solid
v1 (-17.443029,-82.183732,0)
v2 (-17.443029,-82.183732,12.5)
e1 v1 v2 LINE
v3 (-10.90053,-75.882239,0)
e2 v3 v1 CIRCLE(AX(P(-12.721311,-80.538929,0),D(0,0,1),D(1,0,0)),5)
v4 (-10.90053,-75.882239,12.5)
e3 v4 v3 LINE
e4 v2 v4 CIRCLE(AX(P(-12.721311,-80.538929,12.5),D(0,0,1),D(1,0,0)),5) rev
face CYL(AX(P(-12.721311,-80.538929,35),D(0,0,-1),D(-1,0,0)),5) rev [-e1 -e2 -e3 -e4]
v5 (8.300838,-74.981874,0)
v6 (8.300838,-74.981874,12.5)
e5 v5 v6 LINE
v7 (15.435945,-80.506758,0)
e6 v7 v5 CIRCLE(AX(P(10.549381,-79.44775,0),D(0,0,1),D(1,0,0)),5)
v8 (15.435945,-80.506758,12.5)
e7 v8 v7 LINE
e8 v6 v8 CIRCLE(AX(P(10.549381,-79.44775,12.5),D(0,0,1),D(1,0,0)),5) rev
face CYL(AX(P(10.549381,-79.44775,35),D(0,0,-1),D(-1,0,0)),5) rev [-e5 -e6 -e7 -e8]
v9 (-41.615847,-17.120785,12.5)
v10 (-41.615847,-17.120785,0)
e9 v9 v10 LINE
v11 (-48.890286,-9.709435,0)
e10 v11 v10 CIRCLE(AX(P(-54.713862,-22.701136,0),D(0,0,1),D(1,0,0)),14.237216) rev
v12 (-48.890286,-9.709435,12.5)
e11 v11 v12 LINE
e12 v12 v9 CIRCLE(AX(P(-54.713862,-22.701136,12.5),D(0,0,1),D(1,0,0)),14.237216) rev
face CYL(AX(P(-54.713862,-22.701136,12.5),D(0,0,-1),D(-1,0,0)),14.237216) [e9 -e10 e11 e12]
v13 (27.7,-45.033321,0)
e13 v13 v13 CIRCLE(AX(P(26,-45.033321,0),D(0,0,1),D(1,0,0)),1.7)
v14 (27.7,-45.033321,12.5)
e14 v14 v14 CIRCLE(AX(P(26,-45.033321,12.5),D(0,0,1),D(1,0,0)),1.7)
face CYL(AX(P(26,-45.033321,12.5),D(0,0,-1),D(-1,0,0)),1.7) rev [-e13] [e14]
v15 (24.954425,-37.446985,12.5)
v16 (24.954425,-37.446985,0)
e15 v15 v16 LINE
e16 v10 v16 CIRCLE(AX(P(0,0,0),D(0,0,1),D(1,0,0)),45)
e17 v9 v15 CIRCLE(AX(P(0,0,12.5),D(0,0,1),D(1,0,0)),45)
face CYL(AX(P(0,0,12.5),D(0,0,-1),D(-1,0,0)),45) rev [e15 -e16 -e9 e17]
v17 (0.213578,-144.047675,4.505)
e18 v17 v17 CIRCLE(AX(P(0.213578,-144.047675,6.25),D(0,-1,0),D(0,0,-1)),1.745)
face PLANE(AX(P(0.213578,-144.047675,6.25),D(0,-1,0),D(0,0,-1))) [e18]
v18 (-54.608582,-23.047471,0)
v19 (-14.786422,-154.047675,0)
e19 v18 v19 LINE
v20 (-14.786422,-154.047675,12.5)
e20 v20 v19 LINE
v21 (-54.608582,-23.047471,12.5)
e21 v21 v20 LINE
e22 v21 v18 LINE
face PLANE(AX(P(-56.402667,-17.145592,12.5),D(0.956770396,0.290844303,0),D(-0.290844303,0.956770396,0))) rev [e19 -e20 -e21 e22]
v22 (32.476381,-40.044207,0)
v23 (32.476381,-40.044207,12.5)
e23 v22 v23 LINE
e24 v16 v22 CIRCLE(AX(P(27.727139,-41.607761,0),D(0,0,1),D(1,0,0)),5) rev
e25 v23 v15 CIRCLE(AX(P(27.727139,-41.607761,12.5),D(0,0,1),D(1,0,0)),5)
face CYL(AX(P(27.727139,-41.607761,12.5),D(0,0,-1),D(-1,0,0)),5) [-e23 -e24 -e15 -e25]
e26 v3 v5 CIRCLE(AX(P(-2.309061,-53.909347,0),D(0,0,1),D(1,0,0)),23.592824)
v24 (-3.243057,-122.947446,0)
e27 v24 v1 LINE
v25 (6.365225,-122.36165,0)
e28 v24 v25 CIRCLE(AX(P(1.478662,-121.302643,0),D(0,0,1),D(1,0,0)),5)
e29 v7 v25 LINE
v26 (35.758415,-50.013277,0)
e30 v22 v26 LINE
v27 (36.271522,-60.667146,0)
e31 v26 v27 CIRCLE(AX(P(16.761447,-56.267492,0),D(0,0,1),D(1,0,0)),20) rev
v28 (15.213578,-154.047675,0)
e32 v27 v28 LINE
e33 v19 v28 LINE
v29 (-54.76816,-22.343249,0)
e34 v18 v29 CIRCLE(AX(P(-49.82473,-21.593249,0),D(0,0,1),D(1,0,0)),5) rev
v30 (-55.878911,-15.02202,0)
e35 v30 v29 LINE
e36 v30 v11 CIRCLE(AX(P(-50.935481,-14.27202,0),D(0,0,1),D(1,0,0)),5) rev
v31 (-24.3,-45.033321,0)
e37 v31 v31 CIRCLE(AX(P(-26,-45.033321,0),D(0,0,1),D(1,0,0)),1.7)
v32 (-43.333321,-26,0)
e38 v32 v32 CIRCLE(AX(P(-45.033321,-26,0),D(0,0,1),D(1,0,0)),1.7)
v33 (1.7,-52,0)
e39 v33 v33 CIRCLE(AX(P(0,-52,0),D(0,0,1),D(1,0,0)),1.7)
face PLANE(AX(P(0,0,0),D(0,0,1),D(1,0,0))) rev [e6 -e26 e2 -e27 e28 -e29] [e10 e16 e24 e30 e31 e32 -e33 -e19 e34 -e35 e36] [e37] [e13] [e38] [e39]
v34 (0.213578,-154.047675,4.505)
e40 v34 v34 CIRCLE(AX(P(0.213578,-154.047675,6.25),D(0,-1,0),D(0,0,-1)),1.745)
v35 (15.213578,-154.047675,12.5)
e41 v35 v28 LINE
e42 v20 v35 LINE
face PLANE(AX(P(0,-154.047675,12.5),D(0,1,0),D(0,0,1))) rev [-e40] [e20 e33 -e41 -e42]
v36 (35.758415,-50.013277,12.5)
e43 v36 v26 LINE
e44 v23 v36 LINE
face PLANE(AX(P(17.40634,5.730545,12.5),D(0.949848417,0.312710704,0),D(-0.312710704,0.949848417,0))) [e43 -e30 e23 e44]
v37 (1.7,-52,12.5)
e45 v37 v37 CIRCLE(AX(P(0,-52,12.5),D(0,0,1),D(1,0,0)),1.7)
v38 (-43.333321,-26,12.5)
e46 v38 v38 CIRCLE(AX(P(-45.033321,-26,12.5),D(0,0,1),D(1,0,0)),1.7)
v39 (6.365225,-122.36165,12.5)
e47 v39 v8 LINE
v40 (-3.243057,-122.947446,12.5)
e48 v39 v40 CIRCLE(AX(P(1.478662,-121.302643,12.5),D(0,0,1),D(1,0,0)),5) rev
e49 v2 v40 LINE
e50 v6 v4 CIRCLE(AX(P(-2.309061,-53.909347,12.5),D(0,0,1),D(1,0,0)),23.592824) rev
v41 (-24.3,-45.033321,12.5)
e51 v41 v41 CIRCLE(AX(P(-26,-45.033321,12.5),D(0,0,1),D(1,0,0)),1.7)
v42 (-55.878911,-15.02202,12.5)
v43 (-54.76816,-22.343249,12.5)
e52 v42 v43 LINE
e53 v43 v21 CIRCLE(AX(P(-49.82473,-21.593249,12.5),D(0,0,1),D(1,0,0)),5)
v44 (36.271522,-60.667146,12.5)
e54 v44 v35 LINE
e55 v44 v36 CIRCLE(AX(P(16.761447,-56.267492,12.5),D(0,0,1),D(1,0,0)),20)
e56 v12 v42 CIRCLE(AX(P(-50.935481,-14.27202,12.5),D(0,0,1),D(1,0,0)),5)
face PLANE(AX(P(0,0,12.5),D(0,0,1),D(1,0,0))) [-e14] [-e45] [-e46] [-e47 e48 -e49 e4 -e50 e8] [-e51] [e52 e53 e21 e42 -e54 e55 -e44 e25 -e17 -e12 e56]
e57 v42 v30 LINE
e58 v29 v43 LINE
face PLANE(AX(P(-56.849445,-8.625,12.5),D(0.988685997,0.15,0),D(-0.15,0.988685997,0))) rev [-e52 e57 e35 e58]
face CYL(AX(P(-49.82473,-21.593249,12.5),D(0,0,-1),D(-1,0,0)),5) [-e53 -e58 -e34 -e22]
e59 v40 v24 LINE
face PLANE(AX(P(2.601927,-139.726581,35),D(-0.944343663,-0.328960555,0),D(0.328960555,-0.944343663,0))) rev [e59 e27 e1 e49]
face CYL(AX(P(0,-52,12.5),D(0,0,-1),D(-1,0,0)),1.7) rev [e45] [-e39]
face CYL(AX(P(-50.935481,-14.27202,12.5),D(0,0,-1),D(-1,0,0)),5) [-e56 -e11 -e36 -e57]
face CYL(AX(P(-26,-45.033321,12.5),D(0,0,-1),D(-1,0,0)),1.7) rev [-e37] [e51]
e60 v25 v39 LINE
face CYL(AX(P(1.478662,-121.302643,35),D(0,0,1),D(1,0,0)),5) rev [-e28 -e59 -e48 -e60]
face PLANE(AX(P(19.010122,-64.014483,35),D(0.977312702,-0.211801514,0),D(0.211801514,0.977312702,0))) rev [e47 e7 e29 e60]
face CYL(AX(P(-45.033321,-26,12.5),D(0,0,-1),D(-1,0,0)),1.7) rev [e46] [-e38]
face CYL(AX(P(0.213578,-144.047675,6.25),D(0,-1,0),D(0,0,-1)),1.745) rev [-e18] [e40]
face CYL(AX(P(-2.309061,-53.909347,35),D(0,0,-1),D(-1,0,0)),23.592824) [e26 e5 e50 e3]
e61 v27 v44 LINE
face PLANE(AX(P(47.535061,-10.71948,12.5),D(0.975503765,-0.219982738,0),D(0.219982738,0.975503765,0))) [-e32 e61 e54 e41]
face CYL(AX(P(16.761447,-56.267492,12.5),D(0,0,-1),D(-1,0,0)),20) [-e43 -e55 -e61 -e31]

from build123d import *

# Parameters (mm, degrees)
SKETCH1_R           = 1.7
BOSS_EXTRUDE1_DEPTH = 12.5
FILLET4_R           = 5
FILLET5_R           = 5
FILLET6_R           = 5
FILLET7_R           = 20
SKETCH2_R           = 1.745
CUT_EXTRUDE1_DEPTH  = 10
CUT_EXTRUDE2_DEPTH  = 35
FILLET8_R           = 5
FILLET9_R           = 5


with BuildPart() as part:
    # Sketch1 → Boss-Extrude1 (new body)
    with BuildSketch(Plane.XY):
        with BuildLine():
            ThreePointArc((-41.615847066, -17.120784823), (-47.779287866, -10.266909246), (-56.849444808, -8.625))
            Line((-56.849444808, -8.625), (-54.713862361, -22.701136402))
            Line((-54.713862361, -22.701136402), (-14.786422414, -154.047675233))
            Line((-14.786422414, -154.047675233), (15.213577586, -154.047675233))
            Line((15.213577586, -154.047675233), (37.488789117, -55.269230384))
            Line((37.488789117, -55.269230384), (30.258636425, -33.307880775))
            ThreePointArc((30.258636425, -33.307880775), (-9.886965016, -43.90043192), (-41.615847066, -17.120784823))
        make_face()
        with Locations((0, -52)):
            Circle(SKETCH1_R, mode=Mode.SUBTRACT)
        with Locations((-45.033320997, -26)):
            Circle(SKETCH1_R, mode=Mode.SUBTRACT)
        with Locations((-26, -45.033320997)):
            Circle(SKETCH1_R, mode=Mode.SUBTRACT)
        with Locations((26, -45.033320997)):
            Circle(SKETCH1_R, mode=Mode.SUBTRACT)
    extrude(amount=BOSS_EXTRUDE1_DEPTH)

    # Fillet4
    fillet4_edges = [part.edges().sort_by_distance(p)[0] for p in [
        (-56.849444808, -8.625, 6.25),
    ]]
    fillet(fillet4_edges, radius=FILLET4_R)

    # Fillet5
    fillet5_edges = [part.edges().sort_by_distance(p)[0] for p in [
        (-54.713862361, -22.701136402, 6.25),
    ]]
    fillet(fillet5_edges, radius=FILLET5_R)

    # Fillet6
    fillet6_edges = [part.edges().sort_by_distance(p)[0] for p in [
        (30.258636425, -33.307880775, 6.25),
    ]]
    fillet(fillet6_edges, radius=FILLET6_R)

    # Fillet7
    fillet7_edges = [part.edges().sort_by_distance(p)[0] for p in [
        (37.488789117, -55.269230384, 6.25),
    ]]
    fillet(fillet7_edges, radius=FILLET7_R)

    # Sketch2 → Cut-Extrude1 (cut)
    with BuildSketch(Plane(origin=(0, -154.047675233, 0), x_dir=(-1, 0, 0), z_dir=(0, -1, 0))):
        with Locations((-0.213577586, -6.25)):
            Circle(SKETCH2_R)
    extrude(amount=-CUT_EXTRUDE1_DEPTH, mode=Mode.SUBTRACT)

    # Sketch3 → Cut-Extrude2 (cut)
    with BuildSketch(Plane(origin=(0, 0, 0), x_dir=(-1, 0, 0), z_dir=(0, 0, -1))):
        with BuildLine():
            Line((-19.010121999, -64.01448337), (-2.601927454, -139.726581059))
            Line((-2.601927454, -139.726581059), (24.588794936, -61.670455578))
            ThreePointArc((24.588794936, -61.670455578), (3.57566323, -77.468147247), (-19.010121999, -64.01448337))
        make_face()
    extrude(amount=-CUT_EXTRUDE2_DEPTH, mode=Mode.SUBTRACT)

    # Fillet8
    fillet8_edges = [part.edges().sort_by_distance(p)[0] for p in [
        (2.601927454, -139.726581059, 6.25),
    ]]
    fillet(fillet8_edges, radius=FILLET8_R)

    # Fillet9
    fillet9_edges = [part.edges().sort_by_distance(p)[0] for p in [
        (19.010121999, -64.01448337, 6.25),
    ]]
    fillet(fillet9_edges, radius=FILLET9_R)
    fillet9_2_edges = [part.edges().sort_by_distance(p)[0] for p in [
        (-24.588794936, -61.670455578, 6.25),
    ]]
    fillet(fillet9_2_edges, radius=FILLET9_R)


solid = part.part
